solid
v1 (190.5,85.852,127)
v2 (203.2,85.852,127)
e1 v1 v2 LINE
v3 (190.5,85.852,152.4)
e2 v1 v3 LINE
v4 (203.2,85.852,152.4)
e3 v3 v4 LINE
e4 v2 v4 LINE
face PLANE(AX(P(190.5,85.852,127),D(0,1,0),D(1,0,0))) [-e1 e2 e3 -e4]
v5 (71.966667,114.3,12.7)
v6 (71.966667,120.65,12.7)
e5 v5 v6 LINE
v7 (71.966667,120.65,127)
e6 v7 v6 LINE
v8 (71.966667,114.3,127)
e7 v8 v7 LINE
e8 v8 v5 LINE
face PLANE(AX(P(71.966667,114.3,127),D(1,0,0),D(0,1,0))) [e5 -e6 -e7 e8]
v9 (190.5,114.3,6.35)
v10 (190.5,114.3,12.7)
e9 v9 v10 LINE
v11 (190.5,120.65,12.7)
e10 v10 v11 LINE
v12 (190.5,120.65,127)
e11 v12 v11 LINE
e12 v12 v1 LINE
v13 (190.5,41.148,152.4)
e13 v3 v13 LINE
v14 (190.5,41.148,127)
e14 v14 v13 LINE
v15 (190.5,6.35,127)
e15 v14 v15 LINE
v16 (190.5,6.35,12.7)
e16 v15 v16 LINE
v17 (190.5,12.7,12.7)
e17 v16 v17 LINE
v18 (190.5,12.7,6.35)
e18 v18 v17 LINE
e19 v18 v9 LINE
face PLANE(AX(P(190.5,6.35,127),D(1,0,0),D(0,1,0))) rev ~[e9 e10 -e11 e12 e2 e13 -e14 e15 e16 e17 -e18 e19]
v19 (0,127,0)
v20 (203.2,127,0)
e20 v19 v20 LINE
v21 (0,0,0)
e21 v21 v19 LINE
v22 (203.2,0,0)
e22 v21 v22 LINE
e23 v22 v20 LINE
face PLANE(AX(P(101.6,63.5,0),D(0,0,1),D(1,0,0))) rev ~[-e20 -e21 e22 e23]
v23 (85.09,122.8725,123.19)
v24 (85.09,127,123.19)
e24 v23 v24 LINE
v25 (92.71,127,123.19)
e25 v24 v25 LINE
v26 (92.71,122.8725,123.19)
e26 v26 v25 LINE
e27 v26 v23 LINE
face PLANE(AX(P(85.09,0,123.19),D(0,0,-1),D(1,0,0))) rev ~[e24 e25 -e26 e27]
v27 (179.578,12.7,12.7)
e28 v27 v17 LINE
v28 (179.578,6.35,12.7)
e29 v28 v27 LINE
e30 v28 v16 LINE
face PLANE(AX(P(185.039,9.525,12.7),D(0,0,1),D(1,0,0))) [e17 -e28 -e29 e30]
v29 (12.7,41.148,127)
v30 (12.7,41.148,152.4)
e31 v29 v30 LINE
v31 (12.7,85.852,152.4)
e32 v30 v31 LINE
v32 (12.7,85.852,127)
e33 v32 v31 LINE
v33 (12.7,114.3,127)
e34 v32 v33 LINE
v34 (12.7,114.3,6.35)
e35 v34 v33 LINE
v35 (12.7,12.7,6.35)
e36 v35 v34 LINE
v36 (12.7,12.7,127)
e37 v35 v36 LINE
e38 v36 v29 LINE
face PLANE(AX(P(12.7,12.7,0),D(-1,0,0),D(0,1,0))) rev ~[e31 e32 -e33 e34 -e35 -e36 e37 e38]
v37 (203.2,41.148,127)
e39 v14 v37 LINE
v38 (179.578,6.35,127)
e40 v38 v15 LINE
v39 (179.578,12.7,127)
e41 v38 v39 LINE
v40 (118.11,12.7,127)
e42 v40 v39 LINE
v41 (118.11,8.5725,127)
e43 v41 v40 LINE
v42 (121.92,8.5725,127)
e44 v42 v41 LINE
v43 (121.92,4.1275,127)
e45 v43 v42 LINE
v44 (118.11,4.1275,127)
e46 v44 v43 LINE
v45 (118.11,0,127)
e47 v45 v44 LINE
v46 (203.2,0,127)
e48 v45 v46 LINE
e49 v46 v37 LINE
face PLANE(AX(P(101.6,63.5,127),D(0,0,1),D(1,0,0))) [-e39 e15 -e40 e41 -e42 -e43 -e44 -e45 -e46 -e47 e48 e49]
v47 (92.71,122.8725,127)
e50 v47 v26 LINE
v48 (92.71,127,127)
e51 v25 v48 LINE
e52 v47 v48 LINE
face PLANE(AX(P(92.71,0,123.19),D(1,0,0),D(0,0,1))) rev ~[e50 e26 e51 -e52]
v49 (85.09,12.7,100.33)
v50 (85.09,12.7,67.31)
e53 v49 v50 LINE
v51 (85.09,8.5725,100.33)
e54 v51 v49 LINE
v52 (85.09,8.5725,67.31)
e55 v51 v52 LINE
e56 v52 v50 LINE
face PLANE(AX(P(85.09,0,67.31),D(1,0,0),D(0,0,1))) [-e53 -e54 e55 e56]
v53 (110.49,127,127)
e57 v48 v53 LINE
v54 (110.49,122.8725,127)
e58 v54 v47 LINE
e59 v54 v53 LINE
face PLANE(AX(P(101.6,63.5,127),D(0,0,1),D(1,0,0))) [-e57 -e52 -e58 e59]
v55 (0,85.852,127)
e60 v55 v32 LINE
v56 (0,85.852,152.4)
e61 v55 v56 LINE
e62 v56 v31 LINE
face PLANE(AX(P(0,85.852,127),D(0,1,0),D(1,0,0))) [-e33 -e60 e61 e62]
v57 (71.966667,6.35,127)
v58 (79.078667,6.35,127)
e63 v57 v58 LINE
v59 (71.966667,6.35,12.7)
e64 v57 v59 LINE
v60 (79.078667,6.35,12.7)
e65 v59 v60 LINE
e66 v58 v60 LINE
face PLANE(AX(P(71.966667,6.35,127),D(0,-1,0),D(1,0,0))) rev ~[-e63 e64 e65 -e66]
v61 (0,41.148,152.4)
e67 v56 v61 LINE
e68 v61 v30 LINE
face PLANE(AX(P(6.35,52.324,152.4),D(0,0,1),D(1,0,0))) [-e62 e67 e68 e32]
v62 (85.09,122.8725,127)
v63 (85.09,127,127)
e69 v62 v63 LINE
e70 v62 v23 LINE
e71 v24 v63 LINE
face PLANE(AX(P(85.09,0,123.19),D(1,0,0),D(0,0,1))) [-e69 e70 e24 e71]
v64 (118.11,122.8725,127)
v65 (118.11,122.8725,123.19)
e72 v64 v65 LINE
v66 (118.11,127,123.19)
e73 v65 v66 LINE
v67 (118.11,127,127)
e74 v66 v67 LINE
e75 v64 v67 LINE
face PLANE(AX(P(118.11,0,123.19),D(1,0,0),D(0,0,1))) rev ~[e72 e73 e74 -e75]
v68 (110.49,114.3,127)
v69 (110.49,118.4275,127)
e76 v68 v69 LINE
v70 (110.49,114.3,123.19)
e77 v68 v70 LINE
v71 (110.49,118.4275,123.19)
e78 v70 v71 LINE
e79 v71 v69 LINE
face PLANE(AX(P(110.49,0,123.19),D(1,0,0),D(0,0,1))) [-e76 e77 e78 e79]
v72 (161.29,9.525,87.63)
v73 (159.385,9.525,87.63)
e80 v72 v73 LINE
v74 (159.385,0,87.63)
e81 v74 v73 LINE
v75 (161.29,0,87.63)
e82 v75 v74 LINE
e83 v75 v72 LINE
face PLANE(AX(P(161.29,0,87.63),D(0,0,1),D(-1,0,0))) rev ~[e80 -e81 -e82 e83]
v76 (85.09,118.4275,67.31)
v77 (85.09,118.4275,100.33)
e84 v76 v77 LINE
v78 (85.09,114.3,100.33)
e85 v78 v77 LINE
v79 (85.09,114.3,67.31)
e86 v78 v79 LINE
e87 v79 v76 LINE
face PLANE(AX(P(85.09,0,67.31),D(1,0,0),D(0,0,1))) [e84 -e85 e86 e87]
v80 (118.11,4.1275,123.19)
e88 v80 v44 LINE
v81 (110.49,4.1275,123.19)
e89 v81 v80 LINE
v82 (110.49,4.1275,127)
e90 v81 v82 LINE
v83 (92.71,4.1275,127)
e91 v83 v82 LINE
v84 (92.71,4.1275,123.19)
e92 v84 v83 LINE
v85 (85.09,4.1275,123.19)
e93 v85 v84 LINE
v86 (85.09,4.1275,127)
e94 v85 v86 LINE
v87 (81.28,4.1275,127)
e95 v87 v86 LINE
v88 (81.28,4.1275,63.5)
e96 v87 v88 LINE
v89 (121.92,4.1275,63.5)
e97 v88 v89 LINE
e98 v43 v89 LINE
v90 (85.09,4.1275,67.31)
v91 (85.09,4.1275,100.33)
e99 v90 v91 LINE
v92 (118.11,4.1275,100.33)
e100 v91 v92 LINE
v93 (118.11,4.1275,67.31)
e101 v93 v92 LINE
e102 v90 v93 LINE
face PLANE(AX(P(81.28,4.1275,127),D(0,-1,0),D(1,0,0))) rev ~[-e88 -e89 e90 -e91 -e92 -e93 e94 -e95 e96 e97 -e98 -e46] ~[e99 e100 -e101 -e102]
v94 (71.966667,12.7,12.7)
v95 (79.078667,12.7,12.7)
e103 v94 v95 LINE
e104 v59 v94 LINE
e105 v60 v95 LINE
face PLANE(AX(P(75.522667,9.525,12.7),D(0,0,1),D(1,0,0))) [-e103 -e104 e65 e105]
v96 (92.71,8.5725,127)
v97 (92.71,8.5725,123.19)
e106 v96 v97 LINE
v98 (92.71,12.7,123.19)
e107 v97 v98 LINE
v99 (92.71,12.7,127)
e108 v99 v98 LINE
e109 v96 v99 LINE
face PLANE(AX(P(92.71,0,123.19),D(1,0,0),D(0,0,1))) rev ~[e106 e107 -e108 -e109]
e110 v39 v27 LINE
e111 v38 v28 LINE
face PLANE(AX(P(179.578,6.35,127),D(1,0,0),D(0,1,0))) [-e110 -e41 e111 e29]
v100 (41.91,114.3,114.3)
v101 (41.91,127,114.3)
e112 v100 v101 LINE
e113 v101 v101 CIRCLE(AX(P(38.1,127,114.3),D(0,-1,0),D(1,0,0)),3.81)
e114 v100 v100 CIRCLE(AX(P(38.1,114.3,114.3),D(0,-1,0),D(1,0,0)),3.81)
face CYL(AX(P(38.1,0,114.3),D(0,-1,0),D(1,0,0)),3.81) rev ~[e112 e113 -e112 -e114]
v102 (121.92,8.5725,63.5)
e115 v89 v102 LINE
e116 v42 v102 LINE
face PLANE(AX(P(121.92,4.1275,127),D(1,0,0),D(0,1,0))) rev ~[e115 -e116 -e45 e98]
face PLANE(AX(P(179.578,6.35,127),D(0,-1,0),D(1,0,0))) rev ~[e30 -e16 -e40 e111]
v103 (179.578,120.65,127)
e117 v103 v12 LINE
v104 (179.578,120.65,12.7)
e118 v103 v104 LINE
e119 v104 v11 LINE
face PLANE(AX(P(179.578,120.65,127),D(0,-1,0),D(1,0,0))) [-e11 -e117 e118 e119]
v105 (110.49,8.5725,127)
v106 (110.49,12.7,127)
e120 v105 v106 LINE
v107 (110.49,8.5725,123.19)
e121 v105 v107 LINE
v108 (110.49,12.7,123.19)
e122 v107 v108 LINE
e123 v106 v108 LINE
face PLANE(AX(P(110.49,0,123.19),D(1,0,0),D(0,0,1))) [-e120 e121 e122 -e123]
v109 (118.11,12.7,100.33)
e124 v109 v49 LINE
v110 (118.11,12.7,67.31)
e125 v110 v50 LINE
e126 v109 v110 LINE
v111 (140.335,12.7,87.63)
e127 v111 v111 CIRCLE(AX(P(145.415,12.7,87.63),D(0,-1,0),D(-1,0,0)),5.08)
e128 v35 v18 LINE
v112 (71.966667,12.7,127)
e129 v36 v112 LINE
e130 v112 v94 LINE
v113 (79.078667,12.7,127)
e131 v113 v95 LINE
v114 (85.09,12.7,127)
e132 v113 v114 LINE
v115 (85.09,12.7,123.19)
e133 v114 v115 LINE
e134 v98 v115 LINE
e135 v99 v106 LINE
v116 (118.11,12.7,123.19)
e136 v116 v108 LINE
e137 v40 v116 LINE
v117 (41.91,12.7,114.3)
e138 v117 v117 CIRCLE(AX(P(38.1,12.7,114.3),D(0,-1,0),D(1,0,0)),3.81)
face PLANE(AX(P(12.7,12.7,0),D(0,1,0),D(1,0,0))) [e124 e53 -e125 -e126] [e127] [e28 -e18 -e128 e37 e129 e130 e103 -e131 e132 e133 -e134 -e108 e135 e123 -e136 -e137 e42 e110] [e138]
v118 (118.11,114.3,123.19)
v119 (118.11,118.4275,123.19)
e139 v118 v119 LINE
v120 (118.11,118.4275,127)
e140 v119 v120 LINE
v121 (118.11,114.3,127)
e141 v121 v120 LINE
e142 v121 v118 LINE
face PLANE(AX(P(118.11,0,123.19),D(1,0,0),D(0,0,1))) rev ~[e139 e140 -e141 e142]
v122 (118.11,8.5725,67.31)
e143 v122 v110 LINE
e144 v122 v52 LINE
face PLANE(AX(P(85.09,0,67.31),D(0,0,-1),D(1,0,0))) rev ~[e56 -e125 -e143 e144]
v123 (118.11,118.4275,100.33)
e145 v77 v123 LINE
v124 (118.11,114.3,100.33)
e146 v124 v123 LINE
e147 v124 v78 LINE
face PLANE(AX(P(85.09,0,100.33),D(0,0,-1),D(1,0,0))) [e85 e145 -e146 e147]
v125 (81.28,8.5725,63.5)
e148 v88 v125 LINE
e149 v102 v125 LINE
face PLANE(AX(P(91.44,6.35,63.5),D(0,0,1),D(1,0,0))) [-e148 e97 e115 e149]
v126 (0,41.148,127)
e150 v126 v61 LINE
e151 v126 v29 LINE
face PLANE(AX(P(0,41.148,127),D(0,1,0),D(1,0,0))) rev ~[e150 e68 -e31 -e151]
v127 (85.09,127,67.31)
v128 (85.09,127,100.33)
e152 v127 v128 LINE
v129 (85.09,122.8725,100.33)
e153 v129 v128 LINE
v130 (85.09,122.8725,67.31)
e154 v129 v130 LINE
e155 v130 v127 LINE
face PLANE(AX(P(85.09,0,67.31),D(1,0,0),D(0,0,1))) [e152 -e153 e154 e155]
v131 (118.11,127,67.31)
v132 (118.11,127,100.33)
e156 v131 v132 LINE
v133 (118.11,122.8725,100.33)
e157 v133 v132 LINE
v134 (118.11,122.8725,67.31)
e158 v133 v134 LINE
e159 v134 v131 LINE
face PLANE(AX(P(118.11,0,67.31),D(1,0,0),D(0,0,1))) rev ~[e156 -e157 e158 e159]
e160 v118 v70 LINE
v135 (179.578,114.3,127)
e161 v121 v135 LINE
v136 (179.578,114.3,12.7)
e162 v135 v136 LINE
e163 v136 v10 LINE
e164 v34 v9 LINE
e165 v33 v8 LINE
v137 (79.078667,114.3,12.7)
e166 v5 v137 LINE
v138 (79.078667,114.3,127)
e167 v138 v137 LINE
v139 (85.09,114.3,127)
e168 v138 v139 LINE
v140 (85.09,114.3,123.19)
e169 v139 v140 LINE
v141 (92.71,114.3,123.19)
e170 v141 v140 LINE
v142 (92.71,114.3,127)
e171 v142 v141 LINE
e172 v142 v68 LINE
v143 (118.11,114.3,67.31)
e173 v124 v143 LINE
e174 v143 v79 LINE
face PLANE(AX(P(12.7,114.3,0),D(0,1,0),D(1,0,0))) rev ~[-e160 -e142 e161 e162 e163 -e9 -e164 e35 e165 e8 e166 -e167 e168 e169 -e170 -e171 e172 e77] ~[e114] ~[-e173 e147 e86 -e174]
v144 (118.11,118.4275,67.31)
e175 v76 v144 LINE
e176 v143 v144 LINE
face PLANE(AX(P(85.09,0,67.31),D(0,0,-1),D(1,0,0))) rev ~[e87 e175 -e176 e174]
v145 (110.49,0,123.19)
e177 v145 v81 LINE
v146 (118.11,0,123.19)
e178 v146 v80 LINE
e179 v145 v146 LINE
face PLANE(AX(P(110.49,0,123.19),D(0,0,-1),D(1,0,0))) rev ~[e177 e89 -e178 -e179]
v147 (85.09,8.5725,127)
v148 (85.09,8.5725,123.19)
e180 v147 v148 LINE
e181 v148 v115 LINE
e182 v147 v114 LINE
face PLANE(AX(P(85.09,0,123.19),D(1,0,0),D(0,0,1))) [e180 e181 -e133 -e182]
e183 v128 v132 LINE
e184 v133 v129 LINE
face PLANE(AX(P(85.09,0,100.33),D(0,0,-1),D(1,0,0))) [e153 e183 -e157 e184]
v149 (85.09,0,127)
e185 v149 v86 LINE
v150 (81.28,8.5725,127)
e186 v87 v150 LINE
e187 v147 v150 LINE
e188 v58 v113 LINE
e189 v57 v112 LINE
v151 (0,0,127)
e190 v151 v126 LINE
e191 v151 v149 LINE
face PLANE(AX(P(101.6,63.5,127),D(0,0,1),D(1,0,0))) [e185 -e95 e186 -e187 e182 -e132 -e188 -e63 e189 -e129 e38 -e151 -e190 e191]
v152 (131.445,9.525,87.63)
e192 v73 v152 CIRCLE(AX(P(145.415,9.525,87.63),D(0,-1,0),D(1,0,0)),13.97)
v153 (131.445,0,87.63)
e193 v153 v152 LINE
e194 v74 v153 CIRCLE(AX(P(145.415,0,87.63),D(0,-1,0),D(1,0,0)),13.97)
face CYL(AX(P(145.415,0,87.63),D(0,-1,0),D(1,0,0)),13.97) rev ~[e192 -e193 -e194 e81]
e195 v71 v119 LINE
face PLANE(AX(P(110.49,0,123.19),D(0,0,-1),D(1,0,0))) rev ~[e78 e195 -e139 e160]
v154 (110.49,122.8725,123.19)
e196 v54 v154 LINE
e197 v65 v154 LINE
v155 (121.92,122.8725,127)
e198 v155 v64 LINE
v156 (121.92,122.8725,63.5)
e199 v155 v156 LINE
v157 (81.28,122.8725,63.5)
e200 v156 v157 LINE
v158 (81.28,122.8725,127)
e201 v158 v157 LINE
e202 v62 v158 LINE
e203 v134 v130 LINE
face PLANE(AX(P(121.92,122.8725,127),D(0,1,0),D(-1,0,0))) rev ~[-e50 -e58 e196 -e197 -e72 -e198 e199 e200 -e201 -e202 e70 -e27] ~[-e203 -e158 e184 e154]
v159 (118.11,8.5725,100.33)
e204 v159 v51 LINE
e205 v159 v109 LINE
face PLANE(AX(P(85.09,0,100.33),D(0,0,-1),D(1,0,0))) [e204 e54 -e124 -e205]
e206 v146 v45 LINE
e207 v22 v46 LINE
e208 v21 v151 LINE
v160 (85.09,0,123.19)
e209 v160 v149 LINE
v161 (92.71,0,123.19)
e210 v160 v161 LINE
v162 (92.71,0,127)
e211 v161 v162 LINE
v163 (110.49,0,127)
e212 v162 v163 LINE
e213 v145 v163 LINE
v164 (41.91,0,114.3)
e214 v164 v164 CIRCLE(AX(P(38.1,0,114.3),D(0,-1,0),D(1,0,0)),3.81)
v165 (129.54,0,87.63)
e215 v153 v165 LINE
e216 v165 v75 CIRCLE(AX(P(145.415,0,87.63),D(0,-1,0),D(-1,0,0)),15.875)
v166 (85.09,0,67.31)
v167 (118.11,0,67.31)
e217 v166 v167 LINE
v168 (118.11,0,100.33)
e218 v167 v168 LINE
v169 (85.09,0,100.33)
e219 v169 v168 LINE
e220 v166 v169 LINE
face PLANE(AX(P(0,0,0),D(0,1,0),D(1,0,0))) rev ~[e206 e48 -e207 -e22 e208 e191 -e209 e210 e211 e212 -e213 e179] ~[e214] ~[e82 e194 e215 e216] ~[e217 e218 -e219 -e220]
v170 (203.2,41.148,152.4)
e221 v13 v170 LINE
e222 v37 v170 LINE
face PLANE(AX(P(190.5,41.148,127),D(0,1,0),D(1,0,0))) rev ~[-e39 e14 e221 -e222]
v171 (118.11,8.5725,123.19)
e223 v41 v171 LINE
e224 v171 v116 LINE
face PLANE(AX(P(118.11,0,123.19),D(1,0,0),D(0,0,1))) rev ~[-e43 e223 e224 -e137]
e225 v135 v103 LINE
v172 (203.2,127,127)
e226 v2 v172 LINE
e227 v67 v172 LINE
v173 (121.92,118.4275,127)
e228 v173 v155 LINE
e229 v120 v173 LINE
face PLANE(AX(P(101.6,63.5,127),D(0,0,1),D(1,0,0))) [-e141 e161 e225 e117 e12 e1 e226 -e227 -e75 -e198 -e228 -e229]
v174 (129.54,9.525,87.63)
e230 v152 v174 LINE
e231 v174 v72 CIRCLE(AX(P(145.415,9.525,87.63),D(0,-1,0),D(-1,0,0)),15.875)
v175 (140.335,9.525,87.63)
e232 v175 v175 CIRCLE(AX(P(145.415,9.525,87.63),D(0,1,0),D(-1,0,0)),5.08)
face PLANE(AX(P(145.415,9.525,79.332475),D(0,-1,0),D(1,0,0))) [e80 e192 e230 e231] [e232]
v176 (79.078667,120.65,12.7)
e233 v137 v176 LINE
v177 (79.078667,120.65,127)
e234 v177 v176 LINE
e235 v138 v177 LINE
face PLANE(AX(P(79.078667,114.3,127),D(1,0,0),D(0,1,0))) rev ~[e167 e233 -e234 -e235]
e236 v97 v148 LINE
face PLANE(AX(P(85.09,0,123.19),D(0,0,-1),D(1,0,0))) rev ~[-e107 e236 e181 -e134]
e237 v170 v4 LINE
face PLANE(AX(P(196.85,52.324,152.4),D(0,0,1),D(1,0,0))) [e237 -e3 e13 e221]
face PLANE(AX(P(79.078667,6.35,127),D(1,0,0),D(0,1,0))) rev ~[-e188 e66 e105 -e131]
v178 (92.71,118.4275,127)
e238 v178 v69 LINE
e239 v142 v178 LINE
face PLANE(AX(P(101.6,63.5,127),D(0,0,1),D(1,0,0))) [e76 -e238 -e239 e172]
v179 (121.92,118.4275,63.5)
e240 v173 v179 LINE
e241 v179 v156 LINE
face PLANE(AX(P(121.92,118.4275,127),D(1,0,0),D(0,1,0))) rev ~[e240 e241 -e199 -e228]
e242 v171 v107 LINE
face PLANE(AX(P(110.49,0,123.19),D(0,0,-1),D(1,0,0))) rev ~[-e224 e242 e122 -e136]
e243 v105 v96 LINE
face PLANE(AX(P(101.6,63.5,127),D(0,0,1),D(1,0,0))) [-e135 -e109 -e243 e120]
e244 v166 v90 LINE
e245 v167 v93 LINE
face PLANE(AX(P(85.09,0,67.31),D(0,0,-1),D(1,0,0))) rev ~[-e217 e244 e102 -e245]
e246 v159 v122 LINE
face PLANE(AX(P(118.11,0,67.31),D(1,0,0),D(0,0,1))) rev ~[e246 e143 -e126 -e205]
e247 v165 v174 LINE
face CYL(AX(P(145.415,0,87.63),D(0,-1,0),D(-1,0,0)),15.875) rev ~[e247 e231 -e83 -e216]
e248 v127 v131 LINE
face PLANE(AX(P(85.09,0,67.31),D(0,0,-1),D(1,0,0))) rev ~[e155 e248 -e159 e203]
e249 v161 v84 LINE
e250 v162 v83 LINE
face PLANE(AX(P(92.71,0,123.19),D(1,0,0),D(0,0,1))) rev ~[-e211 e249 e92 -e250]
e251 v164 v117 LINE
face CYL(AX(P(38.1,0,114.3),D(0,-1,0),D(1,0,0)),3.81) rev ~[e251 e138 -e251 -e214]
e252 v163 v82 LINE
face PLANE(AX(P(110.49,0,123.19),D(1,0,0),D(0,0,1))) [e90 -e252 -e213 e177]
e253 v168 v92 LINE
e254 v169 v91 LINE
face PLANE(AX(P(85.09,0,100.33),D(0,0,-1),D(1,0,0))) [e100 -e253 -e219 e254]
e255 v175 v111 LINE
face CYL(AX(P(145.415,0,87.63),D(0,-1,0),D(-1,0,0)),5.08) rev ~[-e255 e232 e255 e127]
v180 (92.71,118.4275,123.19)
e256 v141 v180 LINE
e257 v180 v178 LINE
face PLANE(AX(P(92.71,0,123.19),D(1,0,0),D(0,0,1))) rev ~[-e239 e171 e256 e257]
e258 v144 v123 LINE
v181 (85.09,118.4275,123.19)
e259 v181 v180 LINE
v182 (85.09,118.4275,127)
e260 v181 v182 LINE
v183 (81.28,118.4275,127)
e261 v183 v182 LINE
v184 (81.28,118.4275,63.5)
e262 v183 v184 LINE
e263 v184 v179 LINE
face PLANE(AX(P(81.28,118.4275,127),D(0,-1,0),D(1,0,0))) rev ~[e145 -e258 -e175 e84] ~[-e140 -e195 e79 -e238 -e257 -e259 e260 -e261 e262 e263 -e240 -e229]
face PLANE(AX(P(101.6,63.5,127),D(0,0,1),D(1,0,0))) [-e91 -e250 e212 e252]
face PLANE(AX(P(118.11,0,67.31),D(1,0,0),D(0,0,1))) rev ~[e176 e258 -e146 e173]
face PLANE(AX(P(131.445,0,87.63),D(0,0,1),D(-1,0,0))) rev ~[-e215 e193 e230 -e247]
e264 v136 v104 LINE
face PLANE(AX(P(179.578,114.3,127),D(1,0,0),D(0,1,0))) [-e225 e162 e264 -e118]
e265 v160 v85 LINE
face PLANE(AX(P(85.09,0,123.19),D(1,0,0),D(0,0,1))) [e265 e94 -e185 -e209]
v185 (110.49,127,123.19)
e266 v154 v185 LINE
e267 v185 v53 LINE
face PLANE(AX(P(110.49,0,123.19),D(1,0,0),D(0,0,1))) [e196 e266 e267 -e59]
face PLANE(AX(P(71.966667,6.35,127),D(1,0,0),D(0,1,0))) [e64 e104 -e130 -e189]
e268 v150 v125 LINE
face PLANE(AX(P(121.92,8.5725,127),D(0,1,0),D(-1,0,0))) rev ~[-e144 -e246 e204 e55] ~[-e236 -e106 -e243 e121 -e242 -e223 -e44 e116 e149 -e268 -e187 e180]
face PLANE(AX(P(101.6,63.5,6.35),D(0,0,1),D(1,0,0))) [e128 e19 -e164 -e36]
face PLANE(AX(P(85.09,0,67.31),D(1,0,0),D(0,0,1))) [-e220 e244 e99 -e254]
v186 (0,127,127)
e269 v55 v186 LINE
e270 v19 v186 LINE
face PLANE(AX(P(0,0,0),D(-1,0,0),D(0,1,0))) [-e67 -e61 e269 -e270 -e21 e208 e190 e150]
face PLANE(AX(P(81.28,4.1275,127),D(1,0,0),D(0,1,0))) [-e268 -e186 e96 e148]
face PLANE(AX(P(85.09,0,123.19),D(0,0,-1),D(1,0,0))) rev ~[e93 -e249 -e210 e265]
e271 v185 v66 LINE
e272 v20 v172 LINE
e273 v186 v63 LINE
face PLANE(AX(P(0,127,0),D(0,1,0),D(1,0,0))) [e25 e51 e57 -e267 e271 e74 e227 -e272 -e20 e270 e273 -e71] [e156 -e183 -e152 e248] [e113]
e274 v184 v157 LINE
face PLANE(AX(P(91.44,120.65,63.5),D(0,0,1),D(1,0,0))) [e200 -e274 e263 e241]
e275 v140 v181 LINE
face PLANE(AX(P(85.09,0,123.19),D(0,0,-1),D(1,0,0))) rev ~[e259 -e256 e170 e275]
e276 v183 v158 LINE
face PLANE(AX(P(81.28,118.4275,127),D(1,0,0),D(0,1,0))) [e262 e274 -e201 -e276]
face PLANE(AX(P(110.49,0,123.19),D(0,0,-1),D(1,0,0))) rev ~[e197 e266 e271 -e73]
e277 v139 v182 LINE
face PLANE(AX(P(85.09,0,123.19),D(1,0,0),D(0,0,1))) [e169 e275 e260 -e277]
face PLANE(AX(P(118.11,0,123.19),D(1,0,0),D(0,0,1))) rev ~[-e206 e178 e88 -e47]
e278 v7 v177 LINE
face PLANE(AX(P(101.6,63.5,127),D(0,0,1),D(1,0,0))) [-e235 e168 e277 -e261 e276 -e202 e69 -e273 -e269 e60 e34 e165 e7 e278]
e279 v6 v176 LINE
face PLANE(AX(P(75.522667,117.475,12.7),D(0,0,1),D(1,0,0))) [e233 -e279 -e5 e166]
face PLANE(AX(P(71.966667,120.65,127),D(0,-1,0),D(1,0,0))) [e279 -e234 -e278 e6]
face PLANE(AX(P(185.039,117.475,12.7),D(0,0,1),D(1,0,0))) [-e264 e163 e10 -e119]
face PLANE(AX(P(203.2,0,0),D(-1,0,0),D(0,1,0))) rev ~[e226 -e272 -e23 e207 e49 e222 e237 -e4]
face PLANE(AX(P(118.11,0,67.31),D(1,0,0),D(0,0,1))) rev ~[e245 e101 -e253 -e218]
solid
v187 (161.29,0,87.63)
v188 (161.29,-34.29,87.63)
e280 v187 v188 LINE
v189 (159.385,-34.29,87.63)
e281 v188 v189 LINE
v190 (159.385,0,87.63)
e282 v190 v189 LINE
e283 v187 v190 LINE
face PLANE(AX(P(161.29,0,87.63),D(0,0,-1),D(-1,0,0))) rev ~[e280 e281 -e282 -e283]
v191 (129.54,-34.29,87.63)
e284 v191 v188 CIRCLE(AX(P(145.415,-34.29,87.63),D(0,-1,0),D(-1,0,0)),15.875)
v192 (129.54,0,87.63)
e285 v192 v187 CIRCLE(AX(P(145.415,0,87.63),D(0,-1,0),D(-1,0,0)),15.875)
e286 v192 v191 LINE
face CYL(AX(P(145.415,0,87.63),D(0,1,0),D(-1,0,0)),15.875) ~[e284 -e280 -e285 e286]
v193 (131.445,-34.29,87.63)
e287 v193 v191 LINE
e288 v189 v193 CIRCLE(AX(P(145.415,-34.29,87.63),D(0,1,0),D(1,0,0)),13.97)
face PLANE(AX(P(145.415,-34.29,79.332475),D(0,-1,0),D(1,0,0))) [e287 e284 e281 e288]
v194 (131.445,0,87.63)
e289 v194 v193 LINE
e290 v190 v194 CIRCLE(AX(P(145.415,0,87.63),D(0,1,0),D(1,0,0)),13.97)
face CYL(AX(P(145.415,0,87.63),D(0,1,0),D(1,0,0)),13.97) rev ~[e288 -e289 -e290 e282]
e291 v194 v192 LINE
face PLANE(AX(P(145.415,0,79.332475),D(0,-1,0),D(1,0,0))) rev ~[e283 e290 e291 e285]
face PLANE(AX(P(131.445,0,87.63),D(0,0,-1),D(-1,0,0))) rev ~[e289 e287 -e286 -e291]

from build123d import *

# Parameters (mm, degrees)
F6_W      = 203.2
F6_H      = 127
F6_W_2    = 177.8
F6_H_2    = 101.6
F7_DEPTH  = 127
F8_DEPTH  = 6.35
F9_W      = 20.32
F9_H      = 4.445
F10_DEPTH = 63.5
F11_W     = 33.02
F11_H     = 33.02
F11_W_2   = 7.62
F11_H_2   = 3.81
F12_DEPTH = 127
F13_DEPTH = 12.7
F14_DEPTH = 9.525
F15_DEPTH = 34.29
F16_W     = 10.922
F16_H     = 6.35
F16_W_2   = 7.112
F17_DEPTH = 114.3
F18_W     = 12.7
F18_H     = 22.352
F19_DEPTH = 25.4
F20_R     = 3.81
F21_DEPTH = 127


# Not quite as in the source:
# - a variable given as a bare number and used for a length is read in inches; the dataset says mm whatever the document's units were


with BuildPart() as f7:
    # F6 (on Top) → F7 (new body)
    with BuildSketch(Plane.XY):
        with Locations((101.6, 63.5)):
            Rectangle(F6_W, F6_H)
        with Locations((101.6, 63.5)):
            Rectangle(F6_W_2, F6_H_2, mode=Mode.SUBTRACT)
    extrude(amount=F7_DEPTH)

    # F6 (on Top) → F8 (join)
    with BuildSketch(Plane.XY):
        with Locations((101.6, 63.5)):
            Rectangle(F6_W_2, F6_H_2)
    extrude(amount=F8_DEPTH)

    # F9 (on face) → F10 (cut)
    with BuildSketch(Plane.XY.offset(127)):
        with Locations((91.44, 6.35)):
            Rectangle(F9_W, F9_H)
        with Locations((111.76, 6.35)):
            Rectangle(F9_W, F9_H)
        with Locations((91.44, 120.65)):
            Rectangle(F9_W, F9_H)
        with Locations((111.76, 120.65)):
            Rectangle(F9_W, F9_H)
    extrude(amount=-F10_DEPTH, mode=Mode.SUBTRACT)

    # F11 (on face) → F12 (cut)
    with BuildSketch(Plane.XZ):
        with Locations((101.6, 83.82)):
            Rectangle(F11_W, F11_H)
        with Locations((88.9, 125.095)):
            Rectangle(F11_W_2, F11_H_2)
        with Locations((114.3, 125.095)):
            Rectangle(F11_W_2, F11_H_2)
    extrude(amount=-F12_DEPTH, mode=Mode.SUBTRACT)

    # F11 (on face) → F13 (cut)
    with BuildSketch(Plane.XZ):
        with BuildLine():
            Line((145.415, 87.63), (150.495, 87.63))
            ThreePointArc((150.495, 87.63), (145.415, 92.71), (140.335, 87.63))
            Line((140.335, 87.63), (145.415, 87.63))
        make_face()
        with BuildLine():
            ThreePointArc((140.335, 87.63), (145.415, 82.55), (150.495, 87.63))
            Line((150.495, 87.63), (145.415, 87.63))
            Line((145.415, 87.63), (140.335, 87.63))
        make_face()
    extrude(amount=-F13_DEPTH, mode=Mode.SUBTRACT)

    # F11 (on face) → F14 (cut)
    with BuildSketch(Plane.XZ):
        with BuildLine():
            Line((161.29, 87.63), (159.385, 87.63))
            ThreePointArc((159.385, 87.63), (145.415, 73.66), (131.445, 87.63))
            Line((131.445, 87.63), (129.54, 87.63))
            ThreePointArc((129.54, 87.63), (145.415, 71.755), (161.29, 87.63))
        make_face()
        with BuildLine():
            ThreePointArc((131.445, 87.63), (145.415, 73.66), (159.385, 87.63))
            Line((159.385, 87.63), (150.495, 87.63))
            ThreePointArc((150.495, 87.63), (145.415, 82.55), (140.335, 87.63))
            Line((140.335, 87.63), (131.445, 87.63))
        make_face()
        with BuildLine():
            Line((150.495, 87.63), (159.385, 87.63))
            ThreePointArc((159.385, 87.63), (145.415, 101.6), (131.445, 87.63))
            Line((131.445, 87.63), (140.335, 87.63))
            ThreePointArc((140.335, 87.63), (145.415, 92.71), (150.495, 87.63))
        make_face()
    extrude(amount=-F14_DEPTH, mode=Mode.SUBTRACT)

    # F16 (on face) → F17 (cut)
    with BuildSketch(Plane.XY.offset(127)):
        with Locations((185.039, 9.525)):
            Rectangle(F16_W, F16_H)
        with Locations((75.5226666667, 9.525)):
            Rectangle(F16_W_2, F16_H)
        with Locations((185.039, 117.475)):
            Rectangle(F16_W, F16_H)
        with Locations((75.5226666667, 117.475)):
            Rectangle(F16_W_2, F16_H)
    extrude(amount=-F17_DEPTH, mode=Mode.SUBTRACT)

    # F18 (on face) → F19 (join)
    with BuildSketch(Plane.XY.offset(127)):
        with Locations((6.35, 52.324)):
            Rectangle(F18_W, F18_H)
        with Locations((196.85, 52.324)):
            Rectangle(F18_W, F18_H)
        with Locations((196.85, 74.676)):
            Rectangle(F18_W, F18_H)
        with Locations((6.35, 74.676)):
            Rectangle(F18_W, F18_H)
    extrude(amount=F19_DEPTH)

    # F20 (on face) → F21 (cut)
    with BuildSketch(Plane.XZ):
        with Locations((38.1, 114.3)):
            Circle(F20_R)
    extrude(amount=-F21_DEPTH, mode=Mode.SUBTRACT)


with BuildPart() as f15:
    # F11 (on face) → F15 (new body)
    with BuildSketch(Plane.XZ):
        with BuildLine():
            Line((161.29, 87.63), (159.385, 87.63))
            ThreePointArc((159.385, 87.63), (145.415, 73.66), (131.445, 87.63))
            Line((131.445, 87.63), (129.54, 87.63))
            ThreePointArc((129.54, 87.63), (145.415, 71.755), (161.29, 87.63))
        make_face()
    extrude(amount=F15_DEPTH)


solid = Compound([f7.part, f15.part])
